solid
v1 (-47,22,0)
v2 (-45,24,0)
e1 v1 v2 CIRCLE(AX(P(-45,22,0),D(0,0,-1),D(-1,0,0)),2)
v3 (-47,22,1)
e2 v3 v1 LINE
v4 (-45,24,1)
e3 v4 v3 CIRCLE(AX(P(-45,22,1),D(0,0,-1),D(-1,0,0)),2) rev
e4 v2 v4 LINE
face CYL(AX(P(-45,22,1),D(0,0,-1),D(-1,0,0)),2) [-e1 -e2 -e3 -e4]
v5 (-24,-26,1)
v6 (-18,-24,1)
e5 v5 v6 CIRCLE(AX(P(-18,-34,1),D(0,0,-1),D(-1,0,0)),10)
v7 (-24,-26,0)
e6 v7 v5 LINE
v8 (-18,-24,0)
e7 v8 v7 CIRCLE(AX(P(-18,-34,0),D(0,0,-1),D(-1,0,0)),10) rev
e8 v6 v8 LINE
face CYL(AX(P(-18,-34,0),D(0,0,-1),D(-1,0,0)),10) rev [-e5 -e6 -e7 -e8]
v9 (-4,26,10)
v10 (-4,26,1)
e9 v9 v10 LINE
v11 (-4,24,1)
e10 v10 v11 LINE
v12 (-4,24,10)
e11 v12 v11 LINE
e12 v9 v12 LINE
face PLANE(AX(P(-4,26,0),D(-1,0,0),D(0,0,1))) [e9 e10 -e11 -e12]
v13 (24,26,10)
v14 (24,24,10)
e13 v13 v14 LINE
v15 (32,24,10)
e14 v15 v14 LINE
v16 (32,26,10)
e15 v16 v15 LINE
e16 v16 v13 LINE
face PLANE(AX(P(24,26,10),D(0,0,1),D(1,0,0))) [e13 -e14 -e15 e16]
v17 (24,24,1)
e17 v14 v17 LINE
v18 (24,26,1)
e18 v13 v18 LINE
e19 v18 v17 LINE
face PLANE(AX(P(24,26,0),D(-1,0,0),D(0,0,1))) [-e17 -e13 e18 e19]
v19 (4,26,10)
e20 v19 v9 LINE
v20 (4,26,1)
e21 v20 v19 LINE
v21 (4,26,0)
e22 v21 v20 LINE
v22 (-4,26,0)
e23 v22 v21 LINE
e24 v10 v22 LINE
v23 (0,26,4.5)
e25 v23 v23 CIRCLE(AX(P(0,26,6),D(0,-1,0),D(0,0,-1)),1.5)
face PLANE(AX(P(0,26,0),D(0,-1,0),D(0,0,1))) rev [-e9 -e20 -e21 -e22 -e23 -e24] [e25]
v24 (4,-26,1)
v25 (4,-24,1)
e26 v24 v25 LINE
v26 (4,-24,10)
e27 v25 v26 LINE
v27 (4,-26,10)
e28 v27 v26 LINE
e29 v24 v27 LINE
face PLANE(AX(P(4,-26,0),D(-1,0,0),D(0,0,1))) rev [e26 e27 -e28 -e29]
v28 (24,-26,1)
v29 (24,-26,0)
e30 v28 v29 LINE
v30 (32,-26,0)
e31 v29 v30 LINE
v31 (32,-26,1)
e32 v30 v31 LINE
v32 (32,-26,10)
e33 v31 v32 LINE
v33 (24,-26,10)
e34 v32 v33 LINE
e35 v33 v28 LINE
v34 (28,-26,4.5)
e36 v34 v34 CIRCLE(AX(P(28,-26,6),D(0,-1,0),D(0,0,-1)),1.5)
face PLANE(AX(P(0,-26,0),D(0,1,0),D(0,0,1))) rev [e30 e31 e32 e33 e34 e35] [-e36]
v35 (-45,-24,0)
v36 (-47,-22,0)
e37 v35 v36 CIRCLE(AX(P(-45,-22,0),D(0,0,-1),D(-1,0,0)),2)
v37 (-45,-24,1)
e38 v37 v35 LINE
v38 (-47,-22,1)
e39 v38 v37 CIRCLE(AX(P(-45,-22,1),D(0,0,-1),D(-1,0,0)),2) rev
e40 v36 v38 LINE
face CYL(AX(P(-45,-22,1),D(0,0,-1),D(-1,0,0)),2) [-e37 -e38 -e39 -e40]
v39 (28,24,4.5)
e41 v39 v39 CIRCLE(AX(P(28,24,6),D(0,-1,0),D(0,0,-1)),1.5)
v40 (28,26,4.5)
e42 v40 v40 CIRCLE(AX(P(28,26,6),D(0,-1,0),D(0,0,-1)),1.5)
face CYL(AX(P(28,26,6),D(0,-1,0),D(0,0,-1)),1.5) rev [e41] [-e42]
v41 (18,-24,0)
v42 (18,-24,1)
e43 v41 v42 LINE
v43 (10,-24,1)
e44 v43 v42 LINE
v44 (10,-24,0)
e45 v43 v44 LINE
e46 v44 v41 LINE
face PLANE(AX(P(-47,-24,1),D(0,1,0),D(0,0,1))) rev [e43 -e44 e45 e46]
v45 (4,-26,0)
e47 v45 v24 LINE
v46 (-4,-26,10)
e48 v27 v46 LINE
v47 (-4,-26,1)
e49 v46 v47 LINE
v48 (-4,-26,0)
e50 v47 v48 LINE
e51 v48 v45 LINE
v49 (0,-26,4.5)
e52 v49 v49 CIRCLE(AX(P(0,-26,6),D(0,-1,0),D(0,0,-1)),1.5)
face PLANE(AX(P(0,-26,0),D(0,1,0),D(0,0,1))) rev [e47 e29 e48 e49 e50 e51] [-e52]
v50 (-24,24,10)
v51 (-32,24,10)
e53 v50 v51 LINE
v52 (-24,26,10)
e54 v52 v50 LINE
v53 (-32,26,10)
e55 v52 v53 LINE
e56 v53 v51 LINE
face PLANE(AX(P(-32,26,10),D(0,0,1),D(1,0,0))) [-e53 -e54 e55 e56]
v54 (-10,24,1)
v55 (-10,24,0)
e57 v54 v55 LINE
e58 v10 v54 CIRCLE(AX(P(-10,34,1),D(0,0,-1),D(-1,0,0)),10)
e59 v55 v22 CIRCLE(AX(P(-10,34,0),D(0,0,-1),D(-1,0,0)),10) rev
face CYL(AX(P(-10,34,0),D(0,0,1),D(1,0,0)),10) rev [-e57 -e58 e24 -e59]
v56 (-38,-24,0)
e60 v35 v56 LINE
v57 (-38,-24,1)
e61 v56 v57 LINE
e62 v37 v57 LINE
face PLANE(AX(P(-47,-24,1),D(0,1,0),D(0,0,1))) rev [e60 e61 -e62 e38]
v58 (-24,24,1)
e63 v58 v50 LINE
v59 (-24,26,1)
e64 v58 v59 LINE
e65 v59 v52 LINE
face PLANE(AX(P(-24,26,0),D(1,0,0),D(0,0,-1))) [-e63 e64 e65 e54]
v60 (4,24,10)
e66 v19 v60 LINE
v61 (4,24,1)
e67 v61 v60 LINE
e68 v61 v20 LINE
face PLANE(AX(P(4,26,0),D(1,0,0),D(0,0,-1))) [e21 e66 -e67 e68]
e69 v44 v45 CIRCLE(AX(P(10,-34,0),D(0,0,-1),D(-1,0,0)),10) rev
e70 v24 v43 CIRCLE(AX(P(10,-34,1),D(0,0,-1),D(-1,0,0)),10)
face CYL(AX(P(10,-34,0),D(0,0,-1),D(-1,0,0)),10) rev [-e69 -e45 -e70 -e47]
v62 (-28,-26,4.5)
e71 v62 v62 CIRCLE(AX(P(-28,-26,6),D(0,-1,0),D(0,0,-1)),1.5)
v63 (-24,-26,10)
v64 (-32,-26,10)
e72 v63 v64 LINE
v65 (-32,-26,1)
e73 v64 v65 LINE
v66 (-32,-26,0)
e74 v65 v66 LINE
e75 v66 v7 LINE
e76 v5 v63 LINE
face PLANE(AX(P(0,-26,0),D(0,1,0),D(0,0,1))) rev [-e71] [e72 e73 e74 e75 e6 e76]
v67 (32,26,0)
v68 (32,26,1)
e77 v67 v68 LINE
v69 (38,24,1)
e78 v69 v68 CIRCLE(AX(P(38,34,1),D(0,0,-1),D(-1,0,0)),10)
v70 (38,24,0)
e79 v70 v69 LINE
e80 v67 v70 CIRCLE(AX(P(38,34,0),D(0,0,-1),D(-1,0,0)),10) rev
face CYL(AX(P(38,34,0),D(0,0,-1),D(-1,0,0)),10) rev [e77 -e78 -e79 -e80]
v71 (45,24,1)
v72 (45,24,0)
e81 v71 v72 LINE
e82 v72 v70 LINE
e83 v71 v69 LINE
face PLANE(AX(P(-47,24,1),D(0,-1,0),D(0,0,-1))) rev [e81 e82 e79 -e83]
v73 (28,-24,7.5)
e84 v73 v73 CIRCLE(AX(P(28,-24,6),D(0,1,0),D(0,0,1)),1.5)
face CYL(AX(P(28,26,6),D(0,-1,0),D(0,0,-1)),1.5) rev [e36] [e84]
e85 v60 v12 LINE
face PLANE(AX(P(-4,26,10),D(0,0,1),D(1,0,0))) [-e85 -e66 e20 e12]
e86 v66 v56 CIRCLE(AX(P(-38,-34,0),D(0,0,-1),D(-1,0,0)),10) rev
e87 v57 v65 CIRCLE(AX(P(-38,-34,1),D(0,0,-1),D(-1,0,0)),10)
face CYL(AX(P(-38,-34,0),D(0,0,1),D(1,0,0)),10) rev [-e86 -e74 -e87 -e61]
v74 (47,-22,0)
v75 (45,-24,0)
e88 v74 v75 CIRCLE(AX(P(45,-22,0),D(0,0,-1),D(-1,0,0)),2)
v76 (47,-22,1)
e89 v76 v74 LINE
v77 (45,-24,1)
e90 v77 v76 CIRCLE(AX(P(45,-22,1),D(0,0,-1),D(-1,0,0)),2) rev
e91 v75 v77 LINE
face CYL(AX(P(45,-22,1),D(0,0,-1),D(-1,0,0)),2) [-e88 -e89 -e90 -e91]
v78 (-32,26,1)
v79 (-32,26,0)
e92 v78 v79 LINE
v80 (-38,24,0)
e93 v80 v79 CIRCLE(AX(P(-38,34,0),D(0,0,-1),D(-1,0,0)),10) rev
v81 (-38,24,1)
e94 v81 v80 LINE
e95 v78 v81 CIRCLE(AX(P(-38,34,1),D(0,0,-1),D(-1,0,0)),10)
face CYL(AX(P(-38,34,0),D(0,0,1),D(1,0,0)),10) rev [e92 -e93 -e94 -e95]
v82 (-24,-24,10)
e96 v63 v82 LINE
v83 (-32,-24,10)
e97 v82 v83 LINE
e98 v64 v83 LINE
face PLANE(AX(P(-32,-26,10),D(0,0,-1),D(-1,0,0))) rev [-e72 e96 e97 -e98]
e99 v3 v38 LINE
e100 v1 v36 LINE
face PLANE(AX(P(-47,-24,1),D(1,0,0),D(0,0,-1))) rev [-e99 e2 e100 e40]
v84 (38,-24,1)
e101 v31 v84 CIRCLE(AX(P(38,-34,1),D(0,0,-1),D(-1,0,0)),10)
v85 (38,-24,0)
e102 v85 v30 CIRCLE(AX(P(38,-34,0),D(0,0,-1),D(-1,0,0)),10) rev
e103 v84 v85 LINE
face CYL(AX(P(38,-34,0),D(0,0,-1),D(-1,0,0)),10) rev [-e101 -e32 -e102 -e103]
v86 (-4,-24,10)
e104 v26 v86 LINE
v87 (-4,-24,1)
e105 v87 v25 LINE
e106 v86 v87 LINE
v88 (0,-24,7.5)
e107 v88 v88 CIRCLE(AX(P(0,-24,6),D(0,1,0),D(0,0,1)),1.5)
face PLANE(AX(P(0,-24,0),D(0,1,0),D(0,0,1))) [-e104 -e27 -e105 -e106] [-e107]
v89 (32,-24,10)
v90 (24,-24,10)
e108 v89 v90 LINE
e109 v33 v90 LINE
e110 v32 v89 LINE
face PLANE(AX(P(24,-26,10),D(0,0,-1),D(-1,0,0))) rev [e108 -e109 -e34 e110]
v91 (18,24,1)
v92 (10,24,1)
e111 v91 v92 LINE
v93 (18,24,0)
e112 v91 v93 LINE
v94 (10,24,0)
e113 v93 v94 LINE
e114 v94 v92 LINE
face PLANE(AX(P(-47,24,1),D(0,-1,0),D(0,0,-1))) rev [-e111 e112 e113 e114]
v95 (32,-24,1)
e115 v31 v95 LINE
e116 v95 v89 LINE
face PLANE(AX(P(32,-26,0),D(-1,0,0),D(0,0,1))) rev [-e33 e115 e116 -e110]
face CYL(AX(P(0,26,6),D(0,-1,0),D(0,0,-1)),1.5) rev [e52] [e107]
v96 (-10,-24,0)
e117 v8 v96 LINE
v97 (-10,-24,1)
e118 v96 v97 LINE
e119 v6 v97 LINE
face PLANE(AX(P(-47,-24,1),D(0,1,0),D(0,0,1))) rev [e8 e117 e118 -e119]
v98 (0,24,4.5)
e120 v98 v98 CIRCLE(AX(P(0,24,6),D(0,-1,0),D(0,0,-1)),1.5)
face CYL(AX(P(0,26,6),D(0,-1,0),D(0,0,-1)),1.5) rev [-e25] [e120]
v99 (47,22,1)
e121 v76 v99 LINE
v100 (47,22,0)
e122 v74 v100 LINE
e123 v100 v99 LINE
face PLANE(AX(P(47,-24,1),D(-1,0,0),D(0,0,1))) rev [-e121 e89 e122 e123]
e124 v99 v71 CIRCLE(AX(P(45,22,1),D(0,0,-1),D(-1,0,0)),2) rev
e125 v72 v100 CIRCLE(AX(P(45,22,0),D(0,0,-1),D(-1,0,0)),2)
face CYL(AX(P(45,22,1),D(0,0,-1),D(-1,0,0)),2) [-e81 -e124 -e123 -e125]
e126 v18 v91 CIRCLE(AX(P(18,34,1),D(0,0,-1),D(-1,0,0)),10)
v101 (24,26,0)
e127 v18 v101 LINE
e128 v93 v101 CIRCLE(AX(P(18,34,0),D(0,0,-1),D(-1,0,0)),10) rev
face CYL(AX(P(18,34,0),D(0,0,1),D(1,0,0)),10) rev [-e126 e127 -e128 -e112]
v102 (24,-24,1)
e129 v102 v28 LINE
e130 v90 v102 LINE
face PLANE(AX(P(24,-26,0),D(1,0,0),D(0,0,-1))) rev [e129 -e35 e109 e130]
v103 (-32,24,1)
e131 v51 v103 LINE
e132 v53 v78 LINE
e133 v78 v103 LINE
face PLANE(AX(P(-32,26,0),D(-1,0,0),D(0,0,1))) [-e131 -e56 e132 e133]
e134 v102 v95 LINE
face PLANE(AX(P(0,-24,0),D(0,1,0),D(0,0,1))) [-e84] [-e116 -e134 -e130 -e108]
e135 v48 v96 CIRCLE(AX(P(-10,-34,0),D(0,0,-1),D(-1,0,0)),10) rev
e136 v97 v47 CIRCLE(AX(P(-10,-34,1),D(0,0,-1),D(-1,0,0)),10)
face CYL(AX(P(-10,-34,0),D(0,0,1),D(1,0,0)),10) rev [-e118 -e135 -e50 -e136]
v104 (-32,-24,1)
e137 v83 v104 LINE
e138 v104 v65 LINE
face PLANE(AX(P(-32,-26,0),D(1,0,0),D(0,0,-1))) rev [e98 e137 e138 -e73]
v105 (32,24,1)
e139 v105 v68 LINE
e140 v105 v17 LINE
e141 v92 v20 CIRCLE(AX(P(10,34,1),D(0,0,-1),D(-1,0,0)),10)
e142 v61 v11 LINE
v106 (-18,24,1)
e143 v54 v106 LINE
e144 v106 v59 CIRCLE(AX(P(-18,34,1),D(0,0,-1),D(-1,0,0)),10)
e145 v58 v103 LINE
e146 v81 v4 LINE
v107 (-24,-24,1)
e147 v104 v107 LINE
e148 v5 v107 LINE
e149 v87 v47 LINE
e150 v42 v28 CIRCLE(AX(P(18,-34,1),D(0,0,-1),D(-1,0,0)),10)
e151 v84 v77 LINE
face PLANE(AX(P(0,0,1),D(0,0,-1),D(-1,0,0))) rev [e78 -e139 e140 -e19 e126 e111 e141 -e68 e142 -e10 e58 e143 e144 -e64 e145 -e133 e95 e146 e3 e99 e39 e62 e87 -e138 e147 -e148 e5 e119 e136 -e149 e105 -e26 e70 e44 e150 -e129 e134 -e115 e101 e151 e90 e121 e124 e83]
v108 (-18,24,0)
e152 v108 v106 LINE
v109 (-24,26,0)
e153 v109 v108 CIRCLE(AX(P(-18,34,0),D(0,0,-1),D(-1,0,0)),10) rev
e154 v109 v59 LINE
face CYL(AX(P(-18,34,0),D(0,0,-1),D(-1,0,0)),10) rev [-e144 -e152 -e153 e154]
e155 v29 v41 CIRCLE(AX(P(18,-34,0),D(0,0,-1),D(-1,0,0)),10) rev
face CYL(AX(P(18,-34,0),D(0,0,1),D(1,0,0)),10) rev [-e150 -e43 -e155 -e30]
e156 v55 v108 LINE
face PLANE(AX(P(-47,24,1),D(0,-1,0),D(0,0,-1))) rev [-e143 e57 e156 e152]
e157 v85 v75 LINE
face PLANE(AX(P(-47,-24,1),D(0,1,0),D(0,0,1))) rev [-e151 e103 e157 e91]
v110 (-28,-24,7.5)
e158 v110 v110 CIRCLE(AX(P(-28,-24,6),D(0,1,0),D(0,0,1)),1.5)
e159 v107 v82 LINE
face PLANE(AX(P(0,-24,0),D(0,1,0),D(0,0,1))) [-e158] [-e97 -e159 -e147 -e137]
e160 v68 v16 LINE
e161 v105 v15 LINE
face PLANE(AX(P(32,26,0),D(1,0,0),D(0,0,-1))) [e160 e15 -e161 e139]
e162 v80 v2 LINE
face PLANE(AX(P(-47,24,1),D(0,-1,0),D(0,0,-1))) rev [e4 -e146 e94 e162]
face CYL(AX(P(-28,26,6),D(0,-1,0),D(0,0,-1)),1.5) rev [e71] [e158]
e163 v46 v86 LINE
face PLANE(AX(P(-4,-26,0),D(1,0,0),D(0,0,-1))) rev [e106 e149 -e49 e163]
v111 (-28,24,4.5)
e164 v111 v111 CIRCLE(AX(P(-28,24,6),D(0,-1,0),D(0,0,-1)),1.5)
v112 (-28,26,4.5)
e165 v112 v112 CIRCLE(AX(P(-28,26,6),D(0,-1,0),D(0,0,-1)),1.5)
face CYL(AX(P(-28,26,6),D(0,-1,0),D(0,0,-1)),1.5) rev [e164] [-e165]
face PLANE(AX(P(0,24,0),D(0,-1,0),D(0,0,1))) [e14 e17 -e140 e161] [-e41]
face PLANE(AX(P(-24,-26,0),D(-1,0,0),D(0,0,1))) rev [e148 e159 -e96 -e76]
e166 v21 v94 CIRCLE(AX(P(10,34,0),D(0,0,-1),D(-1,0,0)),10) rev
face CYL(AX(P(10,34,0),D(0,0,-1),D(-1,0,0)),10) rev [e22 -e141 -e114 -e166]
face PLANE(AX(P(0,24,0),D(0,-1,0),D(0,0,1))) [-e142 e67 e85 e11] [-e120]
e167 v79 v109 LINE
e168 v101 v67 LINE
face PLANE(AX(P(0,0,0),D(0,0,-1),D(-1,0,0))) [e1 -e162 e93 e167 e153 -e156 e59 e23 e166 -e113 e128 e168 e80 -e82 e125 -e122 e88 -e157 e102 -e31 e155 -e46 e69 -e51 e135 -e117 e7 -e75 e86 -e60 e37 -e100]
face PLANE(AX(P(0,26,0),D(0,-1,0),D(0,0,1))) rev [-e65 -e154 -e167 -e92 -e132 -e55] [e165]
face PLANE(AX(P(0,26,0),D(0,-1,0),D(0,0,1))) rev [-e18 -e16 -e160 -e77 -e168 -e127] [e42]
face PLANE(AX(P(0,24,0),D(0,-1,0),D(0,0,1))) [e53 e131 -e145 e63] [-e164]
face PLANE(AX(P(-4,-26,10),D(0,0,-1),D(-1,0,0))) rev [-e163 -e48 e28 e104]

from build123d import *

# Parameters (mm, degrees)
SKETCH_1_W          = 94
SKETCH_1_H          = 48
EXTRUDE_1_DEPTH     = 1
SKETCH_2_W          = 8
SKETCH_2_H          = 10
EXTRUDE_2_DEPTH     = 2
FILLET_1_R          = 10
SKETCH_3_R          = 1.5
CUT_EXTRUDE_1_DEPTH = 71.802542327
FILLET_2_R          = 2


with BuildPart() as part:
    # Эскиз1 → Бобышка-Вытянуть1 (new body)
    with BuildSketch(Plane.XY):
        Rectangle(SKETCH_1_W, SKETCH_1_H)
    extrude(amount=EXTRUDE_1_DEPTH)

    # Эскиз2 → Бобышка-Вытянуть2 (add)
    with BuildSketch(Plane.XZ.offset(24)):
        with Locations((-28, 5)):
            Rectangle(SKETCH_2_W, SKETCH_2_H)
        with Locations((28, 5)):
            Rectangle(SKETCH_2_W, SKETCH_2_H)
        with Locations((0, 5)):
            Rectangle(SKETCH_2_W, SKETCH_2_H)
    extrude_2 = extrude(amount=EXTRUDE_2_DEPTH)

    # Зеркальное отражение1: Бобышка-Вытянуть2 across plane
    add(extrude_2.mirror(Plane.ZX))

    # Скругление1
    # the kernel refuses this fillet: 10 mm, written as the material it adds along each edge
    with BuildSketch(Plane(origin=(-32, 24, 1), x_dir=(-1, 0, 0), z_dir=(0, 0, -1)), Plane(origin=(-24, 24, 0), x_dir=(1, 0, 0), z_dir=(0, 0, 1)), Plane(origin=(-4, 24, 1), x_dir=(-1, 0, 0), z_dir=(0, 0, -1)), Plane(origin=(4, 24, 0), x_dir=(1, 0, 0), z_dir=(0, 0, 1)), Plane(origin=(24, 24, 1), x_dir=(-1, 0, 0), z_dir=(0, 0, -1)), Plane(origin=(32, 24, 0), x_dir=(1, 0, 0), z_dir=(0, 0, 1))) as fillet_1_piece_1:
        with BuildLine():
            CenterArc((6, 10), FILLET_1_R, 233.130102354, 36.869897646)
            Line((0, 2), (0, 0))
            Line((0, 0), (6, 0))
        make_face()
    extrude(amount=1)
    with BuildSketch(Plane(origin=(32, -24, 0), x_dir=(0, -1, 0), z_dir=(0, 0, 1)), Plane(origin=(4, -24, 0), x_dir=(0, -1, 0), z_dir=(0, 0, 1)), Plane(origin=(-24, -24, 0), x_dir=(0, -1, 0), z_dir=(0, 0, 1))) as fillet_1_piece_2:
        with BuildLine():
            CenterArc((10, 6), FILLET_1_R, 180, 36.869897646)
            Line((0, 6), (0, 0))
            Line((0, 0), (2, 0))
        make_face()
    extrude(amount=1)
    with BuildSketch(Plane(origin=(24, -24, 1), x_dir=(-1, 0, 0), z_dir=(0, 0, -1)), Plane(origin=(-4, -24, 1), x_dir=(-1, 0, 0), z_dir=(0, 0, -1)), Plane(origin=(-32, -24, 1), x_dir=(-1, 0, 0), z_dir=(0, 0, -1))) as fillet_1_piece_3:
        with BuildLine():
            CenterArc((6, -10), FILLET_1_R, 90, 36.869897646)
            Line((0, -2), (0, 0))
            Line((0, 0), (6, 0))
        make_face()
    extrude(amount=1)

    # Эскиз3 → Вырез-Вытянуть1 (cut, through all)
    with BuildSketch(Plane.XZ.offset(26)):
        with Locations(Location((-28, 6, 0), (0, 0, 270))):
            Circle(SKETCH_3_R)
        with Locations(Location((0, 6, 0), (0, 0, 270))):
            Circle(SKETCH_3_R)
        with Locations(Location((28, 6, 0), (0, 0, 270))):
            Circle(SKETCH_3_R)
    extrude(amount=-CUT_EXTRUDE_1_DEPTH, mode=Mode.SUBTRACT)

    # Скругление2
    fillet_2_edges = [part.edges().sort_by_distance(p)[0] for p in [
        (47, -24, 0.5),
        (-47, -24, 0.5),
        (-47, 24, 0.5),
        (47, 24, 0.5),
    ]]
    fillet(fillet_2_edges, radius=FILLET_2_R)


solid = part.part
